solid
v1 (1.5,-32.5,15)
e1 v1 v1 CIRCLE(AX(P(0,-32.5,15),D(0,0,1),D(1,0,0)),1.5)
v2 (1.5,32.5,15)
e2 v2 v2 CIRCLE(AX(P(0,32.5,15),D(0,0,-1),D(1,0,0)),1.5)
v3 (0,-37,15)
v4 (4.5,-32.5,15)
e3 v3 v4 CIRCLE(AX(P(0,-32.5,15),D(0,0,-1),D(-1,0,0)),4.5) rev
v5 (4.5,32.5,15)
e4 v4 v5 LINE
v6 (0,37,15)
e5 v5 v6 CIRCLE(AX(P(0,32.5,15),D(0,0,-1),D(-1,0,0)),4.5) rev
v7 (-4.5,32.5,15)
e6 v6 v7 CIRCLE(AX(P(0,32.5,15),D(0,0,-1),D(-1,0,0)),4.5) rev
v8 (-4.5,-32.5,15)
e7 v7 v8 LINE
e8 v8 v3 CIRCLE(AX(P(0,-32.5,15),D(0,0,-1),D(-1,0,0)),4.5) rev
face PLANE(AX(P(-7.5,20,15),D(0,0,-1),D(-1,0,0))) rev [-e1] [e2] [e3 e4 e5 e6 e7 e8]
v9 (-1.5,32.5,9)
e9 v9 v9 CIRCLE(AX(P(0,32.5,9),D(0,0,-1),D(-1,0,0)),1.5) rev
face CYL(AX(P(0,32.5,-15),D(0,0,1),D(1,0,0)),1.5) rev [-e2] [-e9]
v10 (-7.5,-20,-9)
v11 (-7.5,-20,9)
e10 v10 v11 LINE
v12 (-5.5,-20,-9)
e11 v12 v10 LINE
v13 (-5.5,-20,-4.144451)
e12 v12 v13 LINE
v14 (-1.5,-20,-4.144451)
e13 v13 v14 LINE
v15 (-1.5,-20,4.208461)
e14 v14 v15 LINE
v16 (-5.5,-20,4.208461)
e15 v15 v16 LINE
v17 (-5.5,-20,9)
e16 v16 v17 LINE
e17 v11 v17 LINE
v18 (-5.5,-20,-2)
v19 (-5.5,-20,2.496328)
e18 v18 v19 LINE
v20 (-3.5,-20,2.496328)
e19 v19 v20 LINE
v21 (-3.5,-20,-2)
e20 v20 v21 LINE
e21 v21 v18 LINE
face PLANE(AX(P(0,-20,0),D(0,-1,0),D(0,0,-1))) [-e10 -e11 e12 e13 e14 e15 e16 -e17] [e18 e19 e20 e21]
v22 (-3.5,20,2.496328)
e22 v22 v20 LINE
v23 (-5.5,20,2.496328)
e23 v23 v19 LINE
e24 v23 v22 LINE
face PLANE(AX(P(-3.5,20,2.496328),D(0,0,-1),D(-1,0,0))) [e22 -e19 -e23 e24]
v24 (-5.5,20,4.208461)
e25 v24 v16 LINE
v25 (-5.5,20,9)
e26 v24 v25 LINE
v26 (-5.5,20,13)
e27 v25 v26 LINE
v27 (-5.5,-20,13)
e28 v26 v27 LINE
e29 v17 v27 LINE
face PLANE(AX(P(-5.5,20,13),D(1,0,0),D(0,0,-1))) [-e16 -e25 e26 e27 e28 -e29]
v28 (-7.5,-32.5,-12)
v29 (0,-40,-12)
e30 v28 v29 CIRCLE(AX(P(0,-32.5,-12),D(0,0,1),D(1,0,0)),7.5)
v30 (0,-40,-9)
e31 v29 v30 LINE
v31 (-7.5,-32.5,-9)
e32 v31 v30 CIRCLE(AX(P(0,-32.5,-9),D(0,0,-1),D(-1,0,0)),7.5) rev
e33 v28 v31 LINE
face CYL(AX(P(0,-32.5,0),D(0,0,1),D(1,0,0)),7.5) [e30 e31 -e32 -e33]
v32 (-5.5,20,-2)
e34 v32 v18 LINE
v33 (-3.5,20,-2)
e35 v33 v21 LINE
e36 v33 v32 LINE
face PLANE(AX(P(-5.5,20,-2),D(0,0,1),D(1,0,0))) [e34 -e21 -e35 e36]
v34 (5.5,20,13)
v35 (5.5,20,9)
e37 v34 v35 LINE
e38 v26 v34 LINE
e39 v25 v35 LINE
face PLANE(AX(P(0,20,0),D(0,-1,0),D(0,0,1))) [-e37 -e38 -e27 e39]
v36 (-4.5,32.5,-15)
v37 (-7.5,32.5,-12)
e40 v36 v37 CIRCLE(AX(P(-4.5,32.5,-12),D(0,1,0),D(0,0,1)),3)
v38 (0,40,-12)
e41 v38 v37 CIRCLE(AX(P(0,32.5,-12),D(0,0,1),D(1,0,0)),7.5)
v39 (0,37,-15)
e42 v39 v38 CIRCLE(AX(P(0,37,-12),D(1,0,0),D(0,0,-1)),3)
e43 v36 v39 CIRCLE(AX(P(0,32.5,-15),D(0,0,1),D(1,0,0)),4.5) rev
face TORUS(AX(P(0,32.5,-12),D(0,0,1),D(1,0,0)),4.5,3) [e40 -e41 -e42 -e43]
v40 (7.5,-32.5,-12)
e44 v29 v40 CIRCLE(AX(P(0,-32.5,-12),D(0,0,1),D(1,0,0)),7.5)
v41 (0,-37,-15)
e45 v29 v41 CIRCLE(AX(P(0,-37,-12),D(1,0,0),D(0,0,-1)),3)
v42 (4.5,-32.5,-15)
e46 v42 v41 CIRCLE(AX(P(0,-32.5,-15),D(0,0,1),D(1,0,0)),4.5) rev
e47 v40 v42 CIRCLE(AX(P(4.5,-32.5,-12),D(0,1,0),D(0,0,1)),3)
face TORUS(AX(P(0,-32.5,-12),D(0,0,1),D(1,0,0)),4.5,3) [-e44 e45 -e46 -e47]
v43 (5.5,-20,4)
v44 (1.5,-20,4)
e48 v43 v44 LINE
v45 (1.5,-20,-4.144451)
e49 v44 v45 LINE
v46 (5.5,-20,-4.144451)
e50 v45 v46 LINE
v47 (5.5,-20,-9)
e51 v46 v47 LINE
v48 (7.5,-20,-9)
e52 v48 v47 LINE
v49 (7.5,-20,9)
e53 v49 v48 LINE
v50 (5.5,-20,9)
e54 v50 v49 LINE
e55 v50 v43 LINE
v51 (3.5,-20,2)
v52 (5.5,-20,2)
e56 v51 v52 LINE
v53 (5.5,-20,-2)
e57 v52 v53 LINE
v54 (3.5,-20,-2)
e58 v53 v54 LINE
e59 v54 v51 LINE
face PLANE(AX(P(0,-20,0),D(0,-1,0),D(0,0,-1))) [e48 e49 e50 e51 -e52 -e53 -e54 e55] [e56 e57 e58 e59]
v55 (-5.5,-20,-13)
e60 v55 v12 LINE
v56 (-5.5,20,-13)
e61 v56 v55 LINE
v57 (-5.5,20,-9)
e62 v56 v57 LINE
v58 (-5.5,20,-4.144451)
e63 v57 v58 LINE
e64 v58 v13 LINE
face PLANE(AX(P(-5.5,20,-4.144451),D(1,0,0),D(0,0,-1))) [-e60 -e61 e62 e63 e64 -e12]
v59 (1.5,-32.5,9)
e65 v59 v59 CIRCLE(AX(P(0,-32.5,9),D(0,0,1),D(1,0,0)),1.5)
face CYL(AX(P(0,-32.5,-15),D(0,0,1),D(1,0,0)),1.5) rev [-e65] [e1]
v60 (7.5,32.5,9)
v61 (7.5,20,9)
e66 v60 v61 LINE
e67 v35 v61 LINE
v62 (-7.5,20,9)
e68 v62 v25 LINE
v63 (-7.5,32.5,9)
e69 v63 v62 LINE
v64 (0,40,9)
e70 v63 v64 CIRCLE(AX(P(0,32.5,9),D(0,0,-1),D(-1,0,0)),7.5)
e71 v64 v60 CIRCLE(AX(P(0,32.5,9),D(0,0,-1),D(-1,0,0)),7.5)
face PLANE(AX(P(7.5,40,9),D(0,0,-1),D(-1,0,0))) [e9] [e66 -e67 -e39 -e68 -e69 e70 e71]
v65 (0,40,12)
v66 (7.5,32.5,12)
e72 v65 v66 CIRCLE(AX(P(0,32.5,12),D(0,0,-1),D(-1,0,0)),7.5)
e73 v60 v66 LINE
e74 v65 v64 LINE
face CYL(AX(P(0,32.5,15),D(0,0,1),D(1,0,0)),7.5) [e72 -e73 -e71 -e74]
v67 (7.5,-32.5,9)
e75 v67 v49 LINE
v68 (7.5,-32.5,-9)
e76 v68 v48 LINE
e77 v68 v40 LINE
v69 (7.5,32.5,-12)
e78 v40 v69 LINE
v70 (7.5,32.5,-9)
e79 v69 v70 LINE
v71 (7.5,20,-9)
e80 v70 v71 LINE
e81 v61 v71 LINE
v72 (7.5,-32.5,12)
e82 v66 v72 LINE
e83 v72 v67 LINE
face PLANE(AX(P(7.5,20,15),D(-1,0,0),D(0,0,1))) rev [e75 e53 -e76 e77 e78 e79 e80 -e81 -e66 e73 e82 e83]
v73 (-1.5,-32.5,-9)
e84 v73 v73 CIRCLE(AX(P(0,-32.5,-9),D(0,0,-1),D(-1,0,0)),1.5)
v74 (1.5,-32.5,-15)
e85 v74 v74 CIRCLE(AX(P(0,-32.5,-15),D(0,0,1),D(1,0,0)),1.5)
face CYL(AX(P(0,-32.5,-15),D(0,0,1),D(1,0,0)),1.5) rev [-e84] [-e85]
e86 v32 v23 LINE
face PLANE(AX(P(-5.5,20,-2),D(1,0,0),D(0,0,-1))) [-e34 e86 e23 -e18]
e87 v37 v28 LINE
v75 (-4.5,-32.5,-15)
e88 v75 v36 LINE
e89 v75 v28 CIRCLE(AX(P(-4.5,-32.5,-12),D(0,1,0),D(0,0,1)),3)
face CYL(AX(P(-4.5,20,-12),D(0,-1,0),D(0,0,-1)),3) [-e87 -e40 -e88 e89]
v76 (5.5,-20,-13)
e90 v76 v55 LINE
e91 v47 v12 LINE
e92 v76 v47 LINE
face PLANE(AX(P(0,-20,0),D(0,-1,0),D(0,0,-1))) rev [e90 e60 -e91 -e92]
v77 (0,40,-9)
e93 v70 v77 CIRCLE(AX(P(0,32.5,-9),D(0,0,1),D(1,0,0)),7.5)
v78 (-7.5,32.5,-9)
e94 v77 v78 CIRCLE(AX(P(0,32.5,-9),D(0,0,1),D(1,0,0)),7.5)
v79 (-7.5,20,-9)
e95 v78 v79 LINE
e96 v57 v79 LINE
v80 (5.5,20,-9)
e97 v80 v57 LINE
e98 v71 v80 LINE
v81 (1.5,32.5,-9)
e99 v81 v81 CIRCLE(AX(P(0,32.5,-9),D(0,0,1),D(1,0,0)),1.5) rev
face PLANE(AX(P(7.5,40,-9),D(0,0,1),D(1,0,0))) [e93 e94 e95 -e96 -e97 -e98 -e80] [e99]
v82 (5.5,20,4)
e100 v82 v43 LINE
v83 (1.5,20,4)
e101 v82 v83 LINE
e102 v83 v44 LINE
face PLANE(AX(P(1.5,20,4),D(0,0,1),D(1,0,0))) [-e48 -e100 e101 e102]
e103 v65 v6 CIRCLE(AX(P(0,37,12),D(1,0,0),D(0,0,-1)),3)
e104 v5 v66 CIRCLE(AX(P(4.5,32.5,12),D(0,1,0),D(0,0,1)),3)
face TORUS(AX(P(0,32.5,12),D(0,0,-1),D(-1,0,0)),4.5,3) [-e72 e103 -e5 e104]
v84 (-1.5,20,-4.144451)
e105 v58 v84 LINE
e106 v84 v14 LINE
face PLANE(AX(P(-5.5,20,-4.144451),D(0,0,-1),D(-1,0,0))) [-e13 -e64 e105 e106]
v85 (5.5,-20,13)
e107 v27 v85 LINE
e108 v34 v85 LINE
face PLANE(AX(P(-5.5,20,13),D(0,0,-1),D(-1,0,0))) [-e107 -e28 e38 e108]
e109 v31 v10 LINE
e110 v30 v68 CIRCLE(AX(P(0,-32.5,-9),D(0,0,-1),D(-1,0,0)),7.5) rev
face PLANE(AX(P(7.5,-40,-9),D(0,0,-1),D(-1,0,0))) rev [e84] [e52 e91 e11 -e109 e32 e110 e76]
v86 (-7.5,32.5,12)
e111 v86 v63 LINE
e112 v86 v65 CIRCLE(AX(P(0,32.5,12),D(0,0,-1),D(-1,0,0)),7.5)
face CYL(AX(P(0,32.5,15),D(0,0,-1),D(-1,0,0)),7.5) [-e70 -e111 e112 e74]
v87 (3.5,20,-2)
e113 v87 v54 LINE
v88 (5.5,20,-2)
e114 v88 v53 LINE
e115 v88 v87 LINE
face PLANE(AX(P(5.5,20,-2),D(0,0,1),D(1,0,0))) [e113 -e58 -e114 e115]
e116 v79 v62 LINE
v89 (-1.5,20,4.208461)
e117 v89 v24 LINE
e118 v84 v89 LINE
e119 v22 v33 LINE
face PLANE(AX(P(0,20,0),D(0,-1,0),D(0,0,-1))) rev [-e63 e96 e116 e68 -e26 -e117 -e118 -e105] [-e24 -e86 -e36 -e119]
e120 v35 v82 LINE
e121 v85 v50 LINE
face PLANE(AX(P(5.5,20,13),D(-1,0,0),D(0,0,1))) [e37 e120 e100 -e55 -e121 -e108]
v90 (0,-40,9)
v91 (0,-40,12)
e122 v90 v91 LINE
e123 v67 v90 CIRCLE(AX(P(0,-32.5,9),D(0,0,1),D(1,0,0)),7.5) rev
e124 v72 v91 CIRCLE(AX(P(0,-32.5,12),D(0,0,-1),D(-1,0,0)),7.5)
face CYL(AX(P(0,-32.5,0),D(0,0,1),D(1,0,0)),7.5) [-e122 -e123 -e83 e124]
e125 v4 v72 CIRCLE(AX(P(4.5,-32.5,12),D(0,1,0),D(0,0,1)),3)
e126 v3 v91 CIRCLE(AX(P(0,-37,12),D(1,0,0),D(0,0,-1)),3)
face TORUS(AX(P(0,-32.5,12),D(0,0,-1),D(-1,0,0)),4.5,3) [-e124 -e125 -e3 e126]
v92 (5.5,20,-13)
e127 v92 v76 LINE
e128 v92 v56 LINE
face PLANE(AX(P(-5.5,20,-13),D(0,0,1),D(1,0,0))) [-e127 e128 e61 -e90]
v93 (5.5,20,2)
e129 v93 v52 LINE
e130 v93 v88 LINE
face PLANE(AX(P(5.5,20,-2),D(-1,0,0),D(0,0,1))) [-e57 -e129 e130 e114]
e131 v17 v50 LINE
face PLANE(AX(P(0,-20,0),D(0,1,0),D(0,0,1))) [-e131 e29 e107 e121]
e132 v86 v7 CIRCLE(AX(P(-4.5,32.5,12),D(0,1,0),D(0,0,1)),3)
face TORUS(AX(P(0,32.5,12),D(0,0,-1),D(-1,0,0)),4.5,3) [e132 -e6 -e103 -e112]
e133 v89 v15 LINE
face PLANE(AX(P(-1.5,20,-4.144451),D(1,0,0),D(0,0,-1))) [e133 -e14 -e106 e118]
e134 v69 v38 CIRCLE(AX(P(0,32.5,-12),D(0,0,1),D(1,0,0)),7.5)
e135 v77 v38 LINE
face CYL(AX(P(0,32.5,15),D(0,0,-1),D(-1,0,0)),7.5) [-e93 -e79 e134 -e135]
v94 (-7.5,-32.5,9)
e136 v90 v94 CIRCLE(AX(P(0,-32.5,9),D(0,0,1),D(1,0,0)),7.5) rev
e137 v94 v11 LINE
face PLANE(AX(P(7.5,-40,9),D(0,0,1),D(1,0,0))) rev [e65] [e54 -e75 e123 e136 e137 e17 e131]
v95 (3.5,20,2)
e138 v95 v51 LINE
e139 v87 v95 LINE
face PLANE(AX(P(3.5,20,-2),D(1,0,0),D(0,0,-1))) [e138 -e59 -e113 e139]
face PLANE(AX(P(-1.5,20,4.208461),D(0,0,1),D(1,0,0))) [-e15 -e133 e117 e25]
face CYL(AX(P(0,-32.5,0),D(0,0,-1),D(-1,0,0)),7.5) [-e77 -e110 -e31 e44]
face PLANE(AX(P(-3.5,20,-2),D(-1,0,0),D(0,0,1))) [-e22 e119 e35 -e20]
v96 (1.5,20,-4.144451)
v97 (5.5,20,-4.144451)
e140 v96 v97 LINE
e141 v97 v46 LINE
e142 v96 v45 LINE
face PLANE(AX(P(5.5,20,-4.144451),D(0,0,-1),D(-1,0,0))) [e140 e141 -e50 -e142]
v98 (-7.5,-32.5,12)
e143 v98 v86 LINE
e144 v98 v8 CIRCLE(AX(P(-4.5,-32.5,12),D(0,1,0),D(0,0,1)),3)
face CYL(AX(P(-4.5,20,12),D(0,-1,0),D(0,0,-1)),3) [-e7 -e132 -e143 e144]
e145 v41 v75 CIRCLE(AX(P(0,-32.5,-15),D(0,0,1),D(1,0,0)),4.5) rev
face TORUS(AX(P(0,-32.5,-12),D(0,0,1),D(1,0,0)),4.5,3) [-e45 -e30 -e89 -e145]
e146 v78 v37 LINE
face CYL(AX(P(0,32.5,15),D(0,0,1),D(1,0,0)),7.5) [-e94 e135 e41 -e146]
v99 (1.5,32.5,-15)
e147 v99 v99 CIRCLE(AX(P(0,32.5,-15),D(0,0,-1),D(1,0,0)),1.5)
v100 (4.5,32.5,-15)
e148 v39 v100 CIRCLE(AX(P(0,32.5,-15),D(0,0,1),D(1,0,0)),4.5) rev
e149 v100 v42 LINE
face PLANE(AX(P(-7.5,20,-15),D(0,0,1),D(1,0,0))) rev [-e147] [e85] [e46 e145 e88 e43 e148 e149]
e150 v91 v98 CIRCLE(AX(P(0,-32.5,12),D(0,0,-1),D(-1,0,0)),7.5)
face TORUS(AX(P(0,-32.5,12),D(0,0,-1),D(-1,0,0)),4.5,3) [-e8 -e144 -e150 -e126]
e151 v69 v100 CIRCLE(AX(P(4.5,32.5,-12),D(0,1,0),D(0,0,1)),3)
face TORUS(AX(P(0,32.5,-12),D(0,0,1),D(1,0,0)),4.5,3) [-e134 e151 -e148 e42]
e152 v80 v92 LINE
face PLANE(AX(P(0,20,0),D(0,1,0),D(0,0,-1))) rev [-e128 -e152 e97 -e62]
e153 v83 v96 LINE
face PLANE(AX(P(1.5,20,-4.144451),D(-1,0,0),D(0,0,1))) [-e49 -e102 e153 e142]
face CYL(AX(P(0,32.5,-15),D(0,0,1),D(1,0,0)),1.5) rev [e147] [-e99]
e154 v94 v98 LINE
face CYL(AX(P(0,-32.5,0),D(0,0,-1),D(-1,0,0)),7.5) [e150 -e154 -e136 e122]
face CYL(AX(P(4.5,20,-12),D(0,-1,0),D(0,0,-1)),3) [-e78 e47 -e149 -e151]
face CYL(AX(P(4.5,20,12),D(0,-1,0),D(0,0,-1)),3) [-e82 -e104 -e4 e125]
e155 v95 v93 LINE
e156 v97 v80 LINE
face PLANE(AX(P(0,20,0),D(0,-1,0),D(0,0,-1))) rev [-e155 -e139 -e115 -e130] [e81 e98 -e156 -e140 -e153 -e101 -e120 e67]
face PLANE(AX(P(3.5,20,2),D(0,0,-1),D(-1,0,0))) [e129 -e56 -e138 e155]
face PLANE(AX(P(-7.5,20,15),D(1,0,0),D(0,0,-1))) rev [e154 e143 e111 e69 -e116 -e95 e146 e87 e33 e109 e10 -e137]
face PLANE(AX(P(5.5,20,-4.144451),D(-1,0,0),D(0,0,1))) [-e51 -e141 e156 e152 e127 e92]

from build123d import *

# Parameters (mm, degrees)
BOSS_EXTRUDE1_START  = -20
SKETCH1_W            = 15
SKETCH1_H            = 30
SKETCH1_W_2          = 2
SKETCH1_H_2          = 4.496327887
SKETCH1_H_3          = 4
BOSS_EXTRUDE1_DEPTH  = 40
SKETCH2_W            = 15
SKETCH2_H            = 6
BOSS_EXTRUDE2_DEPTH  = 20
FILLET1_R            = 7.5
SKETCH3_R            = 1.5
CUT_EXTRUDE1_DEPTH   = 51.55937104
FILLET1_OF_MIRROR1_R = 7.5
FILLET4_R            = 3


with BuildPart() as part:
    # Sketch1 → Boss-Extrude1 (new body)
    with BuildSketch(Plane(origin=(0, 0, 0), x_dir=(1, 0, 0), z_dir=(0, 1, 0)).offset(BOSS_EXTRUDE1_START)):
        Rectangle(SKETCH1_W, SKETCH1_H)
        Polygon((-5.5, -13), (5.5, -13), (5.5, -4), (1.5, -4), (1.5, 4.144450542), (5.5, 4.144450542), (5.5, 13), (-5.5, 13), (-5.5, 4.144450542), (-1.5, 4.144450542), (-1.5, -4.208461458), (-5.5, -4.208461458), align=None, mode=Mode.SUBTRACT)
        with Locations((-4.5, -0.248163944)):
            Rectangle(SKETCH1_W_2, SKETCH1_H_2, mode=Mode.SUBTRACT)
        with Locations((4.5, 0)):
            Rectangle(SKETCH1_W_2, SKETCH1_H_3, mode=Mode.SUBTRACT)
    extrude(amount=BOSS_EXTRUDE1_DEPTH)

    # Sketch2 → Boss-Extrude2 (add)
    with BuildSketch(Plane.XZ.offset(20)):
        with Locations((0, 12)):
            Rectangle(SKETCH2_W, SKETCH2_H)
        with Locations((0, -12)):
            Rectangle(SKETCH2_W, SKETCH2_H)
    boss_extrude2 = extrude(amount=BOSS_EXTRUDE2_DEPTH)

    # Fillet1
    fillet1_edges = [part.edges().sort_by_distance(p)[0] for p in [
        (-7.5, -40, 12),
        (-7.5, -40, -12),
        (7.5, -40, -12),
        (7.5, -40, 12),
    ]]
    fillet(fillet1_edges, radius=FILLET1_R - 0.0001)  # a hair under: the kernel refuses the full size

    # Sketch3 → Cut-Extrude1 (cut, through all)
    with BuildSketch(Plane.XY.offset(15)):
        with Locations((0, -32.5)):
            Circle(SKETCH3_R)
    cut_extrude1 = extrude(amount=-CUT_EXTRUDE1_DEPTH, mode=Mode.SUBTRACT)

    # Mirror1: Boss-Extrude2, Cut-Extrude1 across plane
    add(boss_extrude2.mirror(Plane.ZX))
    add(cut_extrude1.mirror(Plane.ZX), mode=Mode.SUBTRACT)

    # Fillet1 of Mirror1
    fillet1_of_mirror1_edges = [part.edges().sort_by_distance(p)[0] for p in [
        (-7.5, 40, 12),
        (-7.5, 40, -12),
        (7.5, 40, -12),
        (7.5, 40, 12),
    ]]
    fillet(fillet1_of_mirror1_edges, radius=FILLET1_OF_MIRROR1_R - 0.0001)  # a hair under: the kernel refuses the full size

    # Fillet4
    fillet4_edges = [part.edges().sort_by_distance(p)[0] for p in [
        (5.303330148, -37.803330148, 15),
        (-5.303330148, -37.803330148, 15),
        (5.303330148, -37.803330148, -15),
        (-5.303330148, -37.803330148, -15),
        (-7.5, 0, 15),
        (-7.5, 0, -15),
        (7.5, 0, 15),
        (5.303330148, 37.803330148, 15),
        (-5.303330148, 37.803330148, 15),
        (7.5, 0, -15),
        (5.303330148, 37.803330148, -15),
        (-5.303330148, 37.803330148, -15),
    ]]
    fillet(fillet4_edges, radius=FILLET4_R)


solid = part.part
